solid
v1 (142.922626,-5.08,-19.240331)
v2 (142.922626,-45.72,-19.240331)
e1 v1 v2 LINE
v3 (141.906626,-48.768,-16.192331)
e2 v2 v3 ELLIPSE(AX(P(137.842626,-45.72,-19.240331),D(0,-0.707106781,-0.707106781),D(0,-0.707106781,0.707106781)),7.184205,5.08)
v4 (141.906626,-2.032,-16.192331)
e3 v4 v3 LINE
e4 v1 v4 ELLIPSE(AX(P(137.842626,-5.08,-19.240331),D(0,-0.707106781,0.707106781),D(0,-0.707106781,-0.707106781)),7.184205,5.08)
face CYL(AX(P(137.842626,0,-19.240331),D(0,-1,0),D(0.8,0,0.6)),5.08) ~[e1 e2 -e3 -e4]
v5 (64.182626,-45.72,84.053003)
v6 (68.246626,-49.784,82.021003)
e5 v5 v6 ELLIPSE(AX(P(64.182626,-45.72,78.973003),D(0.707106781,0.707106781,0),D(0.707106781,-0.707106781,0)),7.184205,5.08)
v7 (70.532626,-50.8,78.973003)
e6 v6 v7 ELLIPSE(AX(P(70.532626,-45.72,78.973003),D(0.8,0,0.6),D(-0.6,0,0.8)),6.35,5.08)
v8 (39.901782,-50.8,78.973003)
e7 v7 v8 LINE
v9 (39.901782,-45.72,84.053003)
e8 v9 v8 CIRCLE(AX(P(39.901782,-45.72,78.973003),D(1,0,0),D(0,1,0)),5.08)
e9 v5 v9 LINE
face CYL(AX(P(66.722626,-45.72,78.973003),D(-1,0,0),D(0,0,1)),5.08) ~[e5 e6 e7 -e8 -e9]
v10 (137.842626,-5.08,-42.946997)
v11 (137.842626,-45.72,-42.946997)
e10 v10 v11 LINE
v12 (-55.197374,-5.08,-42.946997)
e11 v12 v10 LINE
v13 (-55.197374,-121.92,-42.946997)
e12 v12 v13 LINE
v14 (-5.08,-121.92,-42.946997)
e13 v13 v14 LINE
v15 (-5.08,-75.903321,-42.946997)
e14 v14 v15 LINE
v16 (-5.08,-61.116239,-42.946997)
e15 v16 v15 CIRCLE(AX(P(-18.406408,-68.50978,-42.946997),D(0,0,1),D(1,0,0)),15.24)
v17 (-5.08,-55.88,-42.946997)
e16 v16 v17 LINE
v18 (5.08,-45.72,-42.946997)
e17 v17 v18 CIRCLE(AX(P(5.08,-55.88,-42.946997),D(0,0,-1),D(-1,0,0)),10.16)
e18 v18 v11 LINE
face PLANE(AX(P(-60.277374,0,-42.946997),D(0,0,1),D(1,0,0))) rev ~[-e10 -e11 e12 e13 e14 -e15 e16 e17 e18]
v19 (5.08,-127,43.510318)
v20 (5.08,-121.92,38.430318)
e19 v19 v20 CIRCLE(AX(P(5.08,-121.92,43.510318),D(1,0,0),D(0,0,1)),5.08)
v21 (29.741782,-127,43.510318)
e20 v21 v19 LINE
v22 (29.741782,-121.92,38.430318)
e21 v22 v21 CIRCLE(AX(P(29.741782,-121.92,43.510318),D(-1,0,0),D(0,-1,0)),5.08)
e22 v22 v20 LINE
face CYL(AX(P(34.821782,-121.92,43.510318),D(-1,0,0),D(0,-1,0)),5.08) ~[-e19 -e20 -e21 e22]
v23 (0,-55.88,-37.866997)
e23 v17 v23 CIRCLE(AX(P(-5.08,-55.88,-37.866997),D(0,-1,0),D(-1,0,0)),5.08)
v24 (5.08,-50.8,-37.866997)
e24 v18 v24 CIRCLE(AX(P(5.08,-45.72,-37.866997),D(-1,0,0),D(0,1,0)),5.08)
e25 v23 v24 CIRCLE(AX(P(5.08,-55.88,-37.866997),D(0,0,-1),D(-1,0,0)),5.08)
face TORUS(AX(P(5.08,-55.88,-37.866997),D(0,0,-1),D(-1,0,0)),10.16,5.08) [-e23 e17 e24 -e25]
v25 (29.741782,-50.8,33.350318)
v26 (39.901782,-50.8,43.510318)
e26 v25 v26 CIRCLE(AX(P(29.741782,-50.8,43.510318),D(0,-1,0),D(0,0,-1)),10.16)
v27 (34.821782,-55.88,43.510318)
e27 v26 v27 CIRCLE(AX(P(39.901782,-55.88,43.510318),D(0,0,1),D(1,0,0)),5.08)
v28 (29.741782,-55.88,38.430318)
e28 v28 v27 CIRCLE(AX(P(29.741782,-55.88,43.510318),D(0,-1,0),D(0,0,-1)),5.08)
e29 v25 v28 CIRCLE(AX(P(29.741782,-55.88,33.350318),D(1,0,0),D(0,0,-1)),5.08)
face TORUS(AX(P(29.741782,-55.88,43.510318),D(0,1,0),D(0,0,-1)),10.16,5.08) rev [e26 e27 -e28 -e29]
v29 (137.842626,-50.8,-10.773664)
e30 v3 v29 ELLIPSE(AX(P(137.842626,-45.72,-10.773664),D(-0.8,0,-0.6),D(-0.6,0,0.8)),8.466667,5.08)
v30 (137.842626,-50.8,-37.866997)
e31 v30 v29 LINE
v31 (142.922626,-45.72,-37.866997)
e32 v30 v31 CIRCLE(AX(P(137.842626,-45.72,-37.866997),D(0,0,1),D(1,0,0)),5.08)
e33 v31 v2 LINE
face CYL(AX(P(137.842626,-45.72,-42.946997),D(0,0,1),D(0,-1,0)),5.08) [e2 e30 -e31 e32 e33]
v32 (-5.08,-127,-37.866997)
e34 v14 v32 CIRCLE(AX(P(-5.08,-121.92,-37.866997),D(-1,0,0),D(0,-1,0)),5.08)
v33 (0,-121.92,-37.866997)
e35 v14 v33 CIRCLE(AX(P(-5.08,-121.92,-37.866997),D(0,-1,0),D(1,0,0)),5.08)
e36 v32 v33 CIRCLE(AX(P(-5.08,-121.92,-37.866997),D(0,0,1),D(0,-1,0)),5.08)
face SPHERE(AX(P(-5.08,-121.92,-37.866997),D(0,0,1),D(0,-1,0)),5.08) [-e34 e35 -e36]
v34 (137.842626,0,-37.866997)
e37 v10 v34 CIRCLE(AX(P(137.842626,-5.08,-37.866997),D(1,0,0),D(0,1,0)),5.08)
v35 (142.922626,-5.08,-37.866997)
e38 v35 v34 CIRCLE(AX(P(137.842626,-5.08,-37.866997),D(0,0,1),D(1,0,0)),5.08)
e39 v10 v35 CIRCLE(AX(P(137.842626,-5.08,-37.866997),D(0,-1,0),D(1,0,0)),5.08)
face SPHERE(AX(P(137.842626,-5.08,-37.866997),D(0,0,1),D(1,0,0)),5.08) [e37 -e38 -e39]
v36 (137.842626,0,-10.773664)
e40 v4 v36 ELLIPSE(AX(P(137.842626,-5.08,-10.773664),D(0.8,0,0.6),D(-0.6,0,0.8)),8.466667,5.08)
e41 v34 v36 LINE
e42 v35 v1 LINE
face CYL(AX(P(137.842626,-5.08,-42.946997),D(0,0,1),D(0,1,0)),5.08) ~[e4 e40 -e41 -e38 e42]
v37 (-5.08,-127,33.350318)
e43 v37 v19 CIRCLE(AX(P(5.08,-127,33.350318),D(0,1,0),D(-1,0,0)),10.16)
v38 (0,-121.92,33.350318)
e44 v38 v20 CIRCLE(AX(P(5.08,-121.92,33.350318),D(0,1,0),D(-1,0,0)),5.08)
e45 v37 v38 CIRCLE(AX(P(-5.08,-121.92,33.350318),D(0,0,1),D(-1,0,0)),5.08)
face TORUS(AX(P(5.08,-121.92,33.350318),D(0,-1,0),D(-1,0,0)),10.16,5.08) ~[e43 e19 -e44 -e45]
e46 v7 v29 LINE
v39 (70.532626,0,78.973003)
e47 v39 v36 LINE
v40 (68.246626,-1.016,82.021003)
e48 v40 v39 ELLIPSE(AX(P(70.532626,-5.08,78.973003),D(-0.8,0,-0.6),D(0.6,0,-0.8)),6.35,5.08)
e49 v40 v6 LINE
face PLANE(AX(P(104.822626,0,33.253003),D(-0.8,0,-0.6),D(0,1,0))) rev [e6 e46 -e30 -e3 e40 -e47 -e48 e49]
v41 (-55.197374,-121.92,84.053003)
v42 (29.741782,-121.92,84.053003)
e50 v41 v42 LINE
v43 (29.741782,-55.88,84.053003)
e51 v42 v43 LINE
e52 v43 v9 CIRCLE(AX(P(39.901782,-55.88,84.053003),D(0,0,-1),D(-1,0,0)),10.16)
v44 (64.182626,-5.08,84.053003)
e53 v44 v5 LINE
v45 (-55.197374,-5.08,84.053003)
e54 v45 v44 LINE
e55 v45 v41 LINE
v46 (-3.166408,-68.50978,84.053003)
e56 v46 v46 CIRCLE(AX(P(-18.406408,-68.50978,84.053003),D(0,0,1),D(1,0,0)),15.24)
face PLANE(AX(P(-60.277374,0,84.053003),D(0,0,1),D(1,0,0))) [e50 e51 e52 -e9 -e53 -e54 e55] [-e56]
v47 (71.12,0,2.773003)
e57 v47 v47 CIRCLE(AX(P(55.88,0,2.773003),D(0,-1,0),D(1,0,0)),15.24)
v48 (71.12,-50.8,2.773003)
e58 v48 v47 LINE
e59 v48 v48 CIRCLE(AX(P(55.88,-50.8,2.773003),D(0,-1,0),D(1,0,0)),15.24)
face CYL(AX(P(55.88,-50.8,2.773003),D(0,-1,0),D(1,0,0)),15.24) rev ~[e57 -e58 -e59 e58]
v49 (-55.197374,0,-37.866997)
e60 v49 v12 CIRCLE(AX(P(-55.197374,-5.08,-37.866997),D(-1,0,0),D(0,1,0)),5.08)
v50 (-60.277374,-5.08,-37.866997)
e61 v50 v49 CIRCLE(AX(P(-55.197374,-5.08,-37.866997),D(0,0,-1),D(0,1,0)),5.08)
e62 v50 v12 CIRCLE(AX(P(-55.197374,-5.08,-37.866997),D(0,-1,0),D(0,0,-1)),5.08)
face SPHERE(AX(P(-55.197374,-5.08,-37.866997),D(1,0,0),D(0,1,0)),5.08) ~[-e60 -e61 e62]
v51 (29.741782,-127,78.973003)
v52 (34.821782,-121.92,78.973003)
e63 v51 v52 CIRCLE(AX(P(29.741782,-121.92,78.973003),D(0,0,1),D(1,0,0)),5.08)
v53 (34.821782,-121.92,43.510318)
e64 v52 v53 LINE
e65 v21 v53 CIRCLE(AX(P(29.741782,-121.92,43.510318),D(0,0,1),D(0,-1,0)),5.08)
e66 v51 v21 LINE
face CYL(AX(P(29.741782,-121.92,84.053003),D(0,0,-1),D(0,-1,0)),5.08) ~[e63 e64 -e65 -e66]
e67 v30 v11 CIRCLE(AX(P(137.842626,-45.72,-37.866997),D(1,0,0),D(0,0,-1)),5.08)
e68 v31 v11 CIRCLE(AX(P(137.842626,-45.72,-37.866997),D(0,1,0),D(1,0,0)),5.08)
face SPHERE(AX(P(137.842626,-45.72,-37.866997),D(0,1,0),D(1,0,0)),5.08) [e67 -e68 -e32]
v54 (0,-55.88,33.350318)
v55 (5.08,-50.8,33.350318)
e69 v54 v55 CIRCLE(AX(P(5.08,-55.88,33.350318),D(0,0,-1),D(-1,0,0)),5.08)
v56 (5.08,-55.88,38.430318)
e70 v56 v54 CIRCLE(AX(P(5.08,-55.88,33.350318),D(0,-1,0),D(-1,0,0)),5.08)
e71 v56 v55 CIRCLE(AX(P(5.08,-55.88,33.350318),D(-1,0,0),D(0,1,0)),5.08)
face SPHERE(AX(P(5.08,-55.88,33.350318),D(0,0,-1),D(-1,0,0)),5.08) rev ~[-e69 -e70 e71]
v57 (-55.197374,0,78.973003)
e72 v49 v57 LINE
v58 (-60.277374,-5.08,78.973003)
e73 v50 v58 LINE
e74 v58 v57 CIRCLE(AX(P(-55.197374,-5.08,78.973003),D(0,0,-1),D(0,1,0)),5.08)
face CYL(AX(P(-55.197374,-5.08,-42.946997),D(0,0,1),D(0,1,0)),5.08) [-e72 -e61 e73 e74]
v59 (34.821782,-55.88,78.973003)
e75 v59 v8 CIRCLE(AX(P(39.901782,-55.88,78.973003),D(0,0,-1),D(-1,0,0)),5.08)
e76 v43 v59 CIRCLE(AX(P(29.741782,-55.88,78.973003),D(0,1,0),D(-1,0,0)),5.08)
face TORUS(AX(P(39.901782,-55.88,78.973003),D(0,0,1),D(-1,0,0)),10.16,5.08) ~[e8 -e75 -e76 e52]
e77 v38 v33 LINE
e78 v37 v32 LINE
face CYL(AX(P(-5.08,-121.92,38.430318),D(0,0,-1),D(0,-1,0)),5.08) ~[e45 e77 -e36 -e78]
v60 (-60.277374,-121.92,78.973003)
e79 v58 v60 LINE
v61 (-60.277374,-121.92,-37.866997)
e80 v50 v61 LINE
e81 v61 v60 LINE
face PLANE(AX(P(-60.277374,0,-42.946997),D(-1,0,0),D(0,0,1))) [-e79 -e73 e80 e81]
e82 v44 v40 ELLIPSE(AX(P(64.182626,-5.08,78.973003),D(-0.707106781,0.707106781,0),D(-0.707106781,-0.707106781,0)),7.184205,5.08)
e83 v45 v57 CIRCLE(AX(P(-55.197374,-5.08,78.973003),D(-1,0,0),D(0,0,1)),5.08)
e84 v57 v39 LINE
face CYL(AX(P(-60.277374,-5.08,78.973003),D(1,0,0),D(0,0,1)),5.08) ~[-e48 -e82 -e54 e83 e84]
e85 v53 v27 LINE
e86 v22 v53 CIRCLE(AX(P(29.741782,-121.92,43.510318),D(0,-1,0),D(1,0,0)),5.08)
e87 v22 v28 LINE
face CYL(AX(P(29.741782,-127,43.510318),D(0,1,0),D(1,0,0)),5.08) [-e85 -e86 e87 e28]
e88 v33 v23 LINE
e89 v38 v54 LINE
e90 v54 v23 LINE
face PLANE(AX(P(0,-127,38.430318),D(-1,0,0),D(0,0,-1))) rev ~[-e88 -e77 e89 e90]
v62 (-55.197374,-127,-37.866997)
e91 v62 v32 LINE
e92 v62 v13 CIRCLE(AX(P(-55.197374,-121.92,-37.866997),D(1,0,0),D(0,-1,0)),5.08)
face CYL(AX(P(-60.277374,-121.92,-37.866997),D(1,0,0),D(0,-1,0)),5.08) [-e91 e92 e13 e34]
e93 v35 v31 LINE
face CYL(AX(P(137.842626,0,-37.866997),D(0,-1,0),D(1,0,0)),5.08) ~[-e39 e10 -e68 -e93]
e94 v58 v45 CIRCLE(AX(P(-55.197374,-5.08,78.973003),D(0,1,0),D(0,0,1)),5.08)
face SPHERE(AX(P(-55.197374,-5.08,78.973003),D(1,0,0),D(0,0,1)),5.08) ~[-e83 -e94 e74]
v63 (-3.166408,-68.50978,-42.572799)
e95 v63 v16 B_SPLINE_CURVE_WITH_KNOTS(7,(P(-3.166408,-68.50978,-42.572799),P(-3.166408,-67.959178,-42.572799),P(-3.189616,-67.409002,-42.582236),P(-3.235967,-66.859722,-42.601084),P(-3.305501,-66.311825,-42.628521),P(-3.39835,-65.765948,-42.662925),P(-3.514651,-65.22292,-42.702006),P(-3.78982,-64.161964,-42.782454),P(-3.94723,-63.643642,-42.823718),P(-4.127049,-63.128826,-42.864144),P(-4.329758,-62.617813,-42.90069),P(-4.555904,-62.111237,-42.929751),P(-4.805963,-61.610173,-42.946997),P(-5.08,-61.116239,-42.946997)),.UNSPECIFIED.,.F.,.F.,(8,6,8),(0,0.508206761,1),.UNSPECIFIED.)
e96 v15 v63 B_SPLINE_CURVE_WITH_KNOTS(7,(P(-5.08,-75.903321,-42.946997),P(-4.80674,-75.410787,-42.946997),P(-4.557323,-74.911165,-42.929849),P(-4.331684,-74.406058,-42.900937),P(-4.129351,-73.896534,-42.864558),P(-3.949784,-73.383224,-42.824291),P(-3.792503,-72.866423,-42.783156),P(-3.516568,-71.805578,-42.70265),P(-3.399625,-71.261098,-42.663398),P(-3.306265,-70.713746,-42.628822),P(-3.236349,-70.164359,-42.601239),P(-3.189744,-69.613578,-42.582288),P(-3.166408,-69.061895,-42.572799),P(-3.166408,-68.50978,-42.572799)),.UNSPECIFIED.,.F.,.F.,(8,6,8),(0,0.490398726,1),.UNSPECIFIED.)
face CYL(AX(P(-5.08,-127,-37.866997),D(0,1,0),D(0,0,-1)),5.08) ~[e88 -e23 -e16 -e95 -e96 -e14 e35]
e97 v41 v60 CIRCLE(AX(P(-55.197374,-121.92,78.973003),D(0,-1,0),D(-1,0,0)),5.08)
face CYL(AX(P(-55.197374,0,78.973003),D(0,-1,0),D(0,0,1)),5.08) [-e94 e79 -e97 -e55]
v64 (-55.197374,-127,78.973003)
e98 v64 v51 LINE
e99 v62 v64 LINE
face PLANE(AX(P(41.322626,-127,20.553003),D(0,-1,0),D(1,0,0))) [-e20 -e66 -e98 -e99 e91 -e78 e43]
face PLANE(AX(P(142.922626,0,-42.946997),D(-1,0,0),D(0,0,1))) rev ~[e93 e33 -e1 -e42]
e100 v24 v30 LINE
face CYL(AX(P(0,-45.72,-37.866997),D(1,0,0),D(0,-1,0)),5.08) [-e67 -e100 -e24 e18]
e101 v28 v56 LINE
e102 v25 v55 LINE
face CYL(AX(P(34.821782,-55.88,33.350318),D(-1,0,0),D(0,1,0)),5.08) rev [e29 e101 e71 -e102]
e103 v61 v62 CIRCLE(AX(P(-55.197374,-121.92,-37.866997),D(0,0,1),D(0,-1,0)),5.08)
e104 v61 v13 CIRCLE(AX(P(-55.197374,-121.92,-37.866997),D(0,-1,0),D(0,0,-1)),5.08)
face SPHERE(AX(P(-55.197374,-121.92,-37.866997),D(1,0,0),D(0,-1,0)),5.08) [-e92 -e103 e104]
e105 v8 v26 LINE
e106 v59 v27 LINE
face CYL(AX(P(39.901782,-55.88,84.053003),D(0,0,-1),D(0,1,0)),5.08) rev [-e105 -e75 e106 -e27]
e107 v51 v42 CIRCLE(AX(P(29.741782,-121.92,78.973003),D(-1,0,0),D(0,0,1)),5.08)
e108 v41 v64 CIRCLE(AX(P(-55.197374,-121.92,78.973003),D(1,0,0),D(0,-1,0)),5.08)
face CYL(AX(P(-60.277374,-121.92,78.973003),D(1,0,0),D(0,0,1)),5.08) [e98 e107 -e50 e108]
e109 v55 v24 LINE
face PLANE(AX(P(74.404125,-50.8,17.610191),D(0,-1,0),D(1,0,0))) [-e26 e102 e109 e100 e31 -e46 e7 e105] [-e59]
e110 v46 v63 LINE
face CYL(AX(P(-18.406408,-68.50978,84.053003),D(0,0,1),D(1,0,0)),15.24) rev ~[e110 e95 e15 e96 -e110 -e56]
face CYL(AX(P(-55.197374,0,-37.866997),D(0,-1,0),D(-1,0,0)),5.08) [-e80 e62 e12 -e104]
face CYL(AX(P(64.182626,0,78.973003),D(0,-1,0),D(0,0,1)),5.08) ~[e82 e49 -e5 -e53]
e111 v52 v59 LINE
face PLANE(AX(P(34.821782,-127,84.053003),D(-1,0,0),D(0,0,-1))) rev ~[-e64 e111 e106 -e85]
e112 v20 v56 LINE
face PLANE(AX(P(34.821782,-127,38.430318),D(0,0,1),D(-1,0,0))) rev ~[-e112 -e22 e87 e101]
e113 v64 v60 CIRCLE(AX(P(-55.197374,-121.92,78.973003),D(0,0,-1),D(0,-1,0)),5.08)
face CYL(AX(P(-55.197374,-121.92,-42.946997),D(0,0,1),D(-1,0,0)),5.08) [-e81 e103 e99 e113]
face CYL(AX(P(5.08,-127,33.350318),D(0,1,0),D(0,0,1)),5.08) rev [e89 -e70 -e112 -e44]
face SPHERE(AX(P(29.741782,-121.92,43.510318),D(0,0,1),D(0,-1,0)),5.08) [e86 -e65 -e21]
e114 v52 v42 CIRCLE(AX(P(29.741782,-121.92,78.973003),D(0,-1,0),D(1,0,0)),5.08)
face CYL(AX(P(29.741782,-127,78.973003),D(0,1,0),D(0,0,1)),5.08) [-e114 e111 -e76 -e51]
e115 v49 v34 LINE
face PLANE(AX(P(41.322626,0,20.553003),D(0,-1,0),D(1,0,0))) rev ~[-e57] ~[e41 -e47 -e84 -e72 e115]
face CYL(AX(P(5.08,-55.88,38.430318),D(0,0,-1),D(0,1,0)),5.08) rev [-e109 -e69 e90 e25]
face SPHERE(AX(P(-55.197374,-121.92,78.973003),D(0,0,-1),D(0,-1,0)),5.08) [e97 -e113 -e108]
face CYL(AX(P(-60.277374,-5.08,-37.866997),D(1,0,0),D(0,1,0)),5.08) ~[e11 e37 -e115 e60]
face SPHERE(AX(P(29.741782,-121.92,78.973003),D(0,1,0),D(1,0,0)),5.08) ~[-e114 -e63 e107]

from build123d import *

# Parameters (mm, degrees)
F0_W     = 203.2
F0_H     = 127
F1_DEPTH = 127
F3_DEPTH = 76.2
F4_SIZE2 = 101.6
F4_SIZE  = 76.2
F5_R     = 5.08
F6_R     = 15.24
F7_DEPTH = 50.8
F8_R     = 15.24
F9_DEPTH = 127


with BuildPart() as f1:
    # F0 (on Front) → F1 (new body)
    with BuildSketch(Plane.XZ):
        with Locations((41.3226257026, 20.5530026861)):
            Rectangle(F0_W, F0_H)
    extrude(amount=F1_DEPTH)

    # F2 (on face) → F3 (cut)
    with BuildSketch(Plane.XZ.offset(127)):
        Polygon((142.9226257026, 84.0530026861), (34.8217822611, 84.0530026861), (34.8217822611, 38.4303182364), (0, 38.4303182364), (0, -42.9469973139), (142.9226257026, -42.9469973139), align=None)
    extrude(amount=-F3_DEPTH, mode=Mode.SUBTRACT)

    # F4
    f4_edges = [f1.edges().sort_by_distance(p)[0] for p in [
        (142.922626, -25.4, 84.053003),
    ]]
    f4_side = f1.faces().sort_by_distance((19.028994, -51.591204, 84.053003))[0]
    chamfer(f4_edges, length=F4_SIZE, length2=F4_SIZE2, reference=f4_side)

    # F5
    f5_edges = [f1.edges().sort_by_distance(p)[0] for p in [
        (34.821782, -88.9, 84.053003),
        (0, -127, -2.25834),
        (50.772204, -50.8, 84.053003),
        (34.821782, -50.8, 61.24166),
        (34.821782, -127, 61.24166),
        (17.410891, -127, 38.430318),
        (-30.138687, -127, -42.946997),
        (-60.277374, -127, 20.553003),
        (-12.727796, -127, 84.053003),
        (3.222626, 0, 84.053003),
        (66.722626, -25.4, 84.053003),
        (-60.277374, -63.5, 84.053003),
        (0, -50.8, -2.25834),
        (0, -88.9, 38.430318),
        (0, -88.9, -42.946997),
        (142.922626, 0, -30.246997),
        (142.922626, -25.4, -17.546997),
        (142.922626, -25.4, -42.946997),
        (142.922626, -50.8, -30.246997),
        (41.322626, 0, -42.946997),
        (-60.277374, 0, 20.553003),
        (-60.277374, -63.5, -42.946997),
        (34.821782, -88.9, 38.430318),
        (17.410891, -50.8, 38.430318),
        (71.461313, -50.8, -42.946997),
    ]]
    fillet(f5_edges, radius=F5_R)

    # F6 (on face) → F7 (cut, through all)
    with BuildSketch(Plane.XZ.offset(50.8)):
        with Locations((55.88, 2.7730026861)):
            Circle(F6_R)
    extrude(amount=-F7_DEPTH, mode=Mode.SUBTRACT)

    # F8 (on face) → F9 (cut, through all)
    with BuildSketch(Plane.XY.offset(84.0530026861)):
        with Locations((-18.4064079076, -68.5097798705)):
            Circle(F8_R)
    extrude(amount=-F9_DEPTH, mode=Mode.SUBTRACT)


solid = f1.part
